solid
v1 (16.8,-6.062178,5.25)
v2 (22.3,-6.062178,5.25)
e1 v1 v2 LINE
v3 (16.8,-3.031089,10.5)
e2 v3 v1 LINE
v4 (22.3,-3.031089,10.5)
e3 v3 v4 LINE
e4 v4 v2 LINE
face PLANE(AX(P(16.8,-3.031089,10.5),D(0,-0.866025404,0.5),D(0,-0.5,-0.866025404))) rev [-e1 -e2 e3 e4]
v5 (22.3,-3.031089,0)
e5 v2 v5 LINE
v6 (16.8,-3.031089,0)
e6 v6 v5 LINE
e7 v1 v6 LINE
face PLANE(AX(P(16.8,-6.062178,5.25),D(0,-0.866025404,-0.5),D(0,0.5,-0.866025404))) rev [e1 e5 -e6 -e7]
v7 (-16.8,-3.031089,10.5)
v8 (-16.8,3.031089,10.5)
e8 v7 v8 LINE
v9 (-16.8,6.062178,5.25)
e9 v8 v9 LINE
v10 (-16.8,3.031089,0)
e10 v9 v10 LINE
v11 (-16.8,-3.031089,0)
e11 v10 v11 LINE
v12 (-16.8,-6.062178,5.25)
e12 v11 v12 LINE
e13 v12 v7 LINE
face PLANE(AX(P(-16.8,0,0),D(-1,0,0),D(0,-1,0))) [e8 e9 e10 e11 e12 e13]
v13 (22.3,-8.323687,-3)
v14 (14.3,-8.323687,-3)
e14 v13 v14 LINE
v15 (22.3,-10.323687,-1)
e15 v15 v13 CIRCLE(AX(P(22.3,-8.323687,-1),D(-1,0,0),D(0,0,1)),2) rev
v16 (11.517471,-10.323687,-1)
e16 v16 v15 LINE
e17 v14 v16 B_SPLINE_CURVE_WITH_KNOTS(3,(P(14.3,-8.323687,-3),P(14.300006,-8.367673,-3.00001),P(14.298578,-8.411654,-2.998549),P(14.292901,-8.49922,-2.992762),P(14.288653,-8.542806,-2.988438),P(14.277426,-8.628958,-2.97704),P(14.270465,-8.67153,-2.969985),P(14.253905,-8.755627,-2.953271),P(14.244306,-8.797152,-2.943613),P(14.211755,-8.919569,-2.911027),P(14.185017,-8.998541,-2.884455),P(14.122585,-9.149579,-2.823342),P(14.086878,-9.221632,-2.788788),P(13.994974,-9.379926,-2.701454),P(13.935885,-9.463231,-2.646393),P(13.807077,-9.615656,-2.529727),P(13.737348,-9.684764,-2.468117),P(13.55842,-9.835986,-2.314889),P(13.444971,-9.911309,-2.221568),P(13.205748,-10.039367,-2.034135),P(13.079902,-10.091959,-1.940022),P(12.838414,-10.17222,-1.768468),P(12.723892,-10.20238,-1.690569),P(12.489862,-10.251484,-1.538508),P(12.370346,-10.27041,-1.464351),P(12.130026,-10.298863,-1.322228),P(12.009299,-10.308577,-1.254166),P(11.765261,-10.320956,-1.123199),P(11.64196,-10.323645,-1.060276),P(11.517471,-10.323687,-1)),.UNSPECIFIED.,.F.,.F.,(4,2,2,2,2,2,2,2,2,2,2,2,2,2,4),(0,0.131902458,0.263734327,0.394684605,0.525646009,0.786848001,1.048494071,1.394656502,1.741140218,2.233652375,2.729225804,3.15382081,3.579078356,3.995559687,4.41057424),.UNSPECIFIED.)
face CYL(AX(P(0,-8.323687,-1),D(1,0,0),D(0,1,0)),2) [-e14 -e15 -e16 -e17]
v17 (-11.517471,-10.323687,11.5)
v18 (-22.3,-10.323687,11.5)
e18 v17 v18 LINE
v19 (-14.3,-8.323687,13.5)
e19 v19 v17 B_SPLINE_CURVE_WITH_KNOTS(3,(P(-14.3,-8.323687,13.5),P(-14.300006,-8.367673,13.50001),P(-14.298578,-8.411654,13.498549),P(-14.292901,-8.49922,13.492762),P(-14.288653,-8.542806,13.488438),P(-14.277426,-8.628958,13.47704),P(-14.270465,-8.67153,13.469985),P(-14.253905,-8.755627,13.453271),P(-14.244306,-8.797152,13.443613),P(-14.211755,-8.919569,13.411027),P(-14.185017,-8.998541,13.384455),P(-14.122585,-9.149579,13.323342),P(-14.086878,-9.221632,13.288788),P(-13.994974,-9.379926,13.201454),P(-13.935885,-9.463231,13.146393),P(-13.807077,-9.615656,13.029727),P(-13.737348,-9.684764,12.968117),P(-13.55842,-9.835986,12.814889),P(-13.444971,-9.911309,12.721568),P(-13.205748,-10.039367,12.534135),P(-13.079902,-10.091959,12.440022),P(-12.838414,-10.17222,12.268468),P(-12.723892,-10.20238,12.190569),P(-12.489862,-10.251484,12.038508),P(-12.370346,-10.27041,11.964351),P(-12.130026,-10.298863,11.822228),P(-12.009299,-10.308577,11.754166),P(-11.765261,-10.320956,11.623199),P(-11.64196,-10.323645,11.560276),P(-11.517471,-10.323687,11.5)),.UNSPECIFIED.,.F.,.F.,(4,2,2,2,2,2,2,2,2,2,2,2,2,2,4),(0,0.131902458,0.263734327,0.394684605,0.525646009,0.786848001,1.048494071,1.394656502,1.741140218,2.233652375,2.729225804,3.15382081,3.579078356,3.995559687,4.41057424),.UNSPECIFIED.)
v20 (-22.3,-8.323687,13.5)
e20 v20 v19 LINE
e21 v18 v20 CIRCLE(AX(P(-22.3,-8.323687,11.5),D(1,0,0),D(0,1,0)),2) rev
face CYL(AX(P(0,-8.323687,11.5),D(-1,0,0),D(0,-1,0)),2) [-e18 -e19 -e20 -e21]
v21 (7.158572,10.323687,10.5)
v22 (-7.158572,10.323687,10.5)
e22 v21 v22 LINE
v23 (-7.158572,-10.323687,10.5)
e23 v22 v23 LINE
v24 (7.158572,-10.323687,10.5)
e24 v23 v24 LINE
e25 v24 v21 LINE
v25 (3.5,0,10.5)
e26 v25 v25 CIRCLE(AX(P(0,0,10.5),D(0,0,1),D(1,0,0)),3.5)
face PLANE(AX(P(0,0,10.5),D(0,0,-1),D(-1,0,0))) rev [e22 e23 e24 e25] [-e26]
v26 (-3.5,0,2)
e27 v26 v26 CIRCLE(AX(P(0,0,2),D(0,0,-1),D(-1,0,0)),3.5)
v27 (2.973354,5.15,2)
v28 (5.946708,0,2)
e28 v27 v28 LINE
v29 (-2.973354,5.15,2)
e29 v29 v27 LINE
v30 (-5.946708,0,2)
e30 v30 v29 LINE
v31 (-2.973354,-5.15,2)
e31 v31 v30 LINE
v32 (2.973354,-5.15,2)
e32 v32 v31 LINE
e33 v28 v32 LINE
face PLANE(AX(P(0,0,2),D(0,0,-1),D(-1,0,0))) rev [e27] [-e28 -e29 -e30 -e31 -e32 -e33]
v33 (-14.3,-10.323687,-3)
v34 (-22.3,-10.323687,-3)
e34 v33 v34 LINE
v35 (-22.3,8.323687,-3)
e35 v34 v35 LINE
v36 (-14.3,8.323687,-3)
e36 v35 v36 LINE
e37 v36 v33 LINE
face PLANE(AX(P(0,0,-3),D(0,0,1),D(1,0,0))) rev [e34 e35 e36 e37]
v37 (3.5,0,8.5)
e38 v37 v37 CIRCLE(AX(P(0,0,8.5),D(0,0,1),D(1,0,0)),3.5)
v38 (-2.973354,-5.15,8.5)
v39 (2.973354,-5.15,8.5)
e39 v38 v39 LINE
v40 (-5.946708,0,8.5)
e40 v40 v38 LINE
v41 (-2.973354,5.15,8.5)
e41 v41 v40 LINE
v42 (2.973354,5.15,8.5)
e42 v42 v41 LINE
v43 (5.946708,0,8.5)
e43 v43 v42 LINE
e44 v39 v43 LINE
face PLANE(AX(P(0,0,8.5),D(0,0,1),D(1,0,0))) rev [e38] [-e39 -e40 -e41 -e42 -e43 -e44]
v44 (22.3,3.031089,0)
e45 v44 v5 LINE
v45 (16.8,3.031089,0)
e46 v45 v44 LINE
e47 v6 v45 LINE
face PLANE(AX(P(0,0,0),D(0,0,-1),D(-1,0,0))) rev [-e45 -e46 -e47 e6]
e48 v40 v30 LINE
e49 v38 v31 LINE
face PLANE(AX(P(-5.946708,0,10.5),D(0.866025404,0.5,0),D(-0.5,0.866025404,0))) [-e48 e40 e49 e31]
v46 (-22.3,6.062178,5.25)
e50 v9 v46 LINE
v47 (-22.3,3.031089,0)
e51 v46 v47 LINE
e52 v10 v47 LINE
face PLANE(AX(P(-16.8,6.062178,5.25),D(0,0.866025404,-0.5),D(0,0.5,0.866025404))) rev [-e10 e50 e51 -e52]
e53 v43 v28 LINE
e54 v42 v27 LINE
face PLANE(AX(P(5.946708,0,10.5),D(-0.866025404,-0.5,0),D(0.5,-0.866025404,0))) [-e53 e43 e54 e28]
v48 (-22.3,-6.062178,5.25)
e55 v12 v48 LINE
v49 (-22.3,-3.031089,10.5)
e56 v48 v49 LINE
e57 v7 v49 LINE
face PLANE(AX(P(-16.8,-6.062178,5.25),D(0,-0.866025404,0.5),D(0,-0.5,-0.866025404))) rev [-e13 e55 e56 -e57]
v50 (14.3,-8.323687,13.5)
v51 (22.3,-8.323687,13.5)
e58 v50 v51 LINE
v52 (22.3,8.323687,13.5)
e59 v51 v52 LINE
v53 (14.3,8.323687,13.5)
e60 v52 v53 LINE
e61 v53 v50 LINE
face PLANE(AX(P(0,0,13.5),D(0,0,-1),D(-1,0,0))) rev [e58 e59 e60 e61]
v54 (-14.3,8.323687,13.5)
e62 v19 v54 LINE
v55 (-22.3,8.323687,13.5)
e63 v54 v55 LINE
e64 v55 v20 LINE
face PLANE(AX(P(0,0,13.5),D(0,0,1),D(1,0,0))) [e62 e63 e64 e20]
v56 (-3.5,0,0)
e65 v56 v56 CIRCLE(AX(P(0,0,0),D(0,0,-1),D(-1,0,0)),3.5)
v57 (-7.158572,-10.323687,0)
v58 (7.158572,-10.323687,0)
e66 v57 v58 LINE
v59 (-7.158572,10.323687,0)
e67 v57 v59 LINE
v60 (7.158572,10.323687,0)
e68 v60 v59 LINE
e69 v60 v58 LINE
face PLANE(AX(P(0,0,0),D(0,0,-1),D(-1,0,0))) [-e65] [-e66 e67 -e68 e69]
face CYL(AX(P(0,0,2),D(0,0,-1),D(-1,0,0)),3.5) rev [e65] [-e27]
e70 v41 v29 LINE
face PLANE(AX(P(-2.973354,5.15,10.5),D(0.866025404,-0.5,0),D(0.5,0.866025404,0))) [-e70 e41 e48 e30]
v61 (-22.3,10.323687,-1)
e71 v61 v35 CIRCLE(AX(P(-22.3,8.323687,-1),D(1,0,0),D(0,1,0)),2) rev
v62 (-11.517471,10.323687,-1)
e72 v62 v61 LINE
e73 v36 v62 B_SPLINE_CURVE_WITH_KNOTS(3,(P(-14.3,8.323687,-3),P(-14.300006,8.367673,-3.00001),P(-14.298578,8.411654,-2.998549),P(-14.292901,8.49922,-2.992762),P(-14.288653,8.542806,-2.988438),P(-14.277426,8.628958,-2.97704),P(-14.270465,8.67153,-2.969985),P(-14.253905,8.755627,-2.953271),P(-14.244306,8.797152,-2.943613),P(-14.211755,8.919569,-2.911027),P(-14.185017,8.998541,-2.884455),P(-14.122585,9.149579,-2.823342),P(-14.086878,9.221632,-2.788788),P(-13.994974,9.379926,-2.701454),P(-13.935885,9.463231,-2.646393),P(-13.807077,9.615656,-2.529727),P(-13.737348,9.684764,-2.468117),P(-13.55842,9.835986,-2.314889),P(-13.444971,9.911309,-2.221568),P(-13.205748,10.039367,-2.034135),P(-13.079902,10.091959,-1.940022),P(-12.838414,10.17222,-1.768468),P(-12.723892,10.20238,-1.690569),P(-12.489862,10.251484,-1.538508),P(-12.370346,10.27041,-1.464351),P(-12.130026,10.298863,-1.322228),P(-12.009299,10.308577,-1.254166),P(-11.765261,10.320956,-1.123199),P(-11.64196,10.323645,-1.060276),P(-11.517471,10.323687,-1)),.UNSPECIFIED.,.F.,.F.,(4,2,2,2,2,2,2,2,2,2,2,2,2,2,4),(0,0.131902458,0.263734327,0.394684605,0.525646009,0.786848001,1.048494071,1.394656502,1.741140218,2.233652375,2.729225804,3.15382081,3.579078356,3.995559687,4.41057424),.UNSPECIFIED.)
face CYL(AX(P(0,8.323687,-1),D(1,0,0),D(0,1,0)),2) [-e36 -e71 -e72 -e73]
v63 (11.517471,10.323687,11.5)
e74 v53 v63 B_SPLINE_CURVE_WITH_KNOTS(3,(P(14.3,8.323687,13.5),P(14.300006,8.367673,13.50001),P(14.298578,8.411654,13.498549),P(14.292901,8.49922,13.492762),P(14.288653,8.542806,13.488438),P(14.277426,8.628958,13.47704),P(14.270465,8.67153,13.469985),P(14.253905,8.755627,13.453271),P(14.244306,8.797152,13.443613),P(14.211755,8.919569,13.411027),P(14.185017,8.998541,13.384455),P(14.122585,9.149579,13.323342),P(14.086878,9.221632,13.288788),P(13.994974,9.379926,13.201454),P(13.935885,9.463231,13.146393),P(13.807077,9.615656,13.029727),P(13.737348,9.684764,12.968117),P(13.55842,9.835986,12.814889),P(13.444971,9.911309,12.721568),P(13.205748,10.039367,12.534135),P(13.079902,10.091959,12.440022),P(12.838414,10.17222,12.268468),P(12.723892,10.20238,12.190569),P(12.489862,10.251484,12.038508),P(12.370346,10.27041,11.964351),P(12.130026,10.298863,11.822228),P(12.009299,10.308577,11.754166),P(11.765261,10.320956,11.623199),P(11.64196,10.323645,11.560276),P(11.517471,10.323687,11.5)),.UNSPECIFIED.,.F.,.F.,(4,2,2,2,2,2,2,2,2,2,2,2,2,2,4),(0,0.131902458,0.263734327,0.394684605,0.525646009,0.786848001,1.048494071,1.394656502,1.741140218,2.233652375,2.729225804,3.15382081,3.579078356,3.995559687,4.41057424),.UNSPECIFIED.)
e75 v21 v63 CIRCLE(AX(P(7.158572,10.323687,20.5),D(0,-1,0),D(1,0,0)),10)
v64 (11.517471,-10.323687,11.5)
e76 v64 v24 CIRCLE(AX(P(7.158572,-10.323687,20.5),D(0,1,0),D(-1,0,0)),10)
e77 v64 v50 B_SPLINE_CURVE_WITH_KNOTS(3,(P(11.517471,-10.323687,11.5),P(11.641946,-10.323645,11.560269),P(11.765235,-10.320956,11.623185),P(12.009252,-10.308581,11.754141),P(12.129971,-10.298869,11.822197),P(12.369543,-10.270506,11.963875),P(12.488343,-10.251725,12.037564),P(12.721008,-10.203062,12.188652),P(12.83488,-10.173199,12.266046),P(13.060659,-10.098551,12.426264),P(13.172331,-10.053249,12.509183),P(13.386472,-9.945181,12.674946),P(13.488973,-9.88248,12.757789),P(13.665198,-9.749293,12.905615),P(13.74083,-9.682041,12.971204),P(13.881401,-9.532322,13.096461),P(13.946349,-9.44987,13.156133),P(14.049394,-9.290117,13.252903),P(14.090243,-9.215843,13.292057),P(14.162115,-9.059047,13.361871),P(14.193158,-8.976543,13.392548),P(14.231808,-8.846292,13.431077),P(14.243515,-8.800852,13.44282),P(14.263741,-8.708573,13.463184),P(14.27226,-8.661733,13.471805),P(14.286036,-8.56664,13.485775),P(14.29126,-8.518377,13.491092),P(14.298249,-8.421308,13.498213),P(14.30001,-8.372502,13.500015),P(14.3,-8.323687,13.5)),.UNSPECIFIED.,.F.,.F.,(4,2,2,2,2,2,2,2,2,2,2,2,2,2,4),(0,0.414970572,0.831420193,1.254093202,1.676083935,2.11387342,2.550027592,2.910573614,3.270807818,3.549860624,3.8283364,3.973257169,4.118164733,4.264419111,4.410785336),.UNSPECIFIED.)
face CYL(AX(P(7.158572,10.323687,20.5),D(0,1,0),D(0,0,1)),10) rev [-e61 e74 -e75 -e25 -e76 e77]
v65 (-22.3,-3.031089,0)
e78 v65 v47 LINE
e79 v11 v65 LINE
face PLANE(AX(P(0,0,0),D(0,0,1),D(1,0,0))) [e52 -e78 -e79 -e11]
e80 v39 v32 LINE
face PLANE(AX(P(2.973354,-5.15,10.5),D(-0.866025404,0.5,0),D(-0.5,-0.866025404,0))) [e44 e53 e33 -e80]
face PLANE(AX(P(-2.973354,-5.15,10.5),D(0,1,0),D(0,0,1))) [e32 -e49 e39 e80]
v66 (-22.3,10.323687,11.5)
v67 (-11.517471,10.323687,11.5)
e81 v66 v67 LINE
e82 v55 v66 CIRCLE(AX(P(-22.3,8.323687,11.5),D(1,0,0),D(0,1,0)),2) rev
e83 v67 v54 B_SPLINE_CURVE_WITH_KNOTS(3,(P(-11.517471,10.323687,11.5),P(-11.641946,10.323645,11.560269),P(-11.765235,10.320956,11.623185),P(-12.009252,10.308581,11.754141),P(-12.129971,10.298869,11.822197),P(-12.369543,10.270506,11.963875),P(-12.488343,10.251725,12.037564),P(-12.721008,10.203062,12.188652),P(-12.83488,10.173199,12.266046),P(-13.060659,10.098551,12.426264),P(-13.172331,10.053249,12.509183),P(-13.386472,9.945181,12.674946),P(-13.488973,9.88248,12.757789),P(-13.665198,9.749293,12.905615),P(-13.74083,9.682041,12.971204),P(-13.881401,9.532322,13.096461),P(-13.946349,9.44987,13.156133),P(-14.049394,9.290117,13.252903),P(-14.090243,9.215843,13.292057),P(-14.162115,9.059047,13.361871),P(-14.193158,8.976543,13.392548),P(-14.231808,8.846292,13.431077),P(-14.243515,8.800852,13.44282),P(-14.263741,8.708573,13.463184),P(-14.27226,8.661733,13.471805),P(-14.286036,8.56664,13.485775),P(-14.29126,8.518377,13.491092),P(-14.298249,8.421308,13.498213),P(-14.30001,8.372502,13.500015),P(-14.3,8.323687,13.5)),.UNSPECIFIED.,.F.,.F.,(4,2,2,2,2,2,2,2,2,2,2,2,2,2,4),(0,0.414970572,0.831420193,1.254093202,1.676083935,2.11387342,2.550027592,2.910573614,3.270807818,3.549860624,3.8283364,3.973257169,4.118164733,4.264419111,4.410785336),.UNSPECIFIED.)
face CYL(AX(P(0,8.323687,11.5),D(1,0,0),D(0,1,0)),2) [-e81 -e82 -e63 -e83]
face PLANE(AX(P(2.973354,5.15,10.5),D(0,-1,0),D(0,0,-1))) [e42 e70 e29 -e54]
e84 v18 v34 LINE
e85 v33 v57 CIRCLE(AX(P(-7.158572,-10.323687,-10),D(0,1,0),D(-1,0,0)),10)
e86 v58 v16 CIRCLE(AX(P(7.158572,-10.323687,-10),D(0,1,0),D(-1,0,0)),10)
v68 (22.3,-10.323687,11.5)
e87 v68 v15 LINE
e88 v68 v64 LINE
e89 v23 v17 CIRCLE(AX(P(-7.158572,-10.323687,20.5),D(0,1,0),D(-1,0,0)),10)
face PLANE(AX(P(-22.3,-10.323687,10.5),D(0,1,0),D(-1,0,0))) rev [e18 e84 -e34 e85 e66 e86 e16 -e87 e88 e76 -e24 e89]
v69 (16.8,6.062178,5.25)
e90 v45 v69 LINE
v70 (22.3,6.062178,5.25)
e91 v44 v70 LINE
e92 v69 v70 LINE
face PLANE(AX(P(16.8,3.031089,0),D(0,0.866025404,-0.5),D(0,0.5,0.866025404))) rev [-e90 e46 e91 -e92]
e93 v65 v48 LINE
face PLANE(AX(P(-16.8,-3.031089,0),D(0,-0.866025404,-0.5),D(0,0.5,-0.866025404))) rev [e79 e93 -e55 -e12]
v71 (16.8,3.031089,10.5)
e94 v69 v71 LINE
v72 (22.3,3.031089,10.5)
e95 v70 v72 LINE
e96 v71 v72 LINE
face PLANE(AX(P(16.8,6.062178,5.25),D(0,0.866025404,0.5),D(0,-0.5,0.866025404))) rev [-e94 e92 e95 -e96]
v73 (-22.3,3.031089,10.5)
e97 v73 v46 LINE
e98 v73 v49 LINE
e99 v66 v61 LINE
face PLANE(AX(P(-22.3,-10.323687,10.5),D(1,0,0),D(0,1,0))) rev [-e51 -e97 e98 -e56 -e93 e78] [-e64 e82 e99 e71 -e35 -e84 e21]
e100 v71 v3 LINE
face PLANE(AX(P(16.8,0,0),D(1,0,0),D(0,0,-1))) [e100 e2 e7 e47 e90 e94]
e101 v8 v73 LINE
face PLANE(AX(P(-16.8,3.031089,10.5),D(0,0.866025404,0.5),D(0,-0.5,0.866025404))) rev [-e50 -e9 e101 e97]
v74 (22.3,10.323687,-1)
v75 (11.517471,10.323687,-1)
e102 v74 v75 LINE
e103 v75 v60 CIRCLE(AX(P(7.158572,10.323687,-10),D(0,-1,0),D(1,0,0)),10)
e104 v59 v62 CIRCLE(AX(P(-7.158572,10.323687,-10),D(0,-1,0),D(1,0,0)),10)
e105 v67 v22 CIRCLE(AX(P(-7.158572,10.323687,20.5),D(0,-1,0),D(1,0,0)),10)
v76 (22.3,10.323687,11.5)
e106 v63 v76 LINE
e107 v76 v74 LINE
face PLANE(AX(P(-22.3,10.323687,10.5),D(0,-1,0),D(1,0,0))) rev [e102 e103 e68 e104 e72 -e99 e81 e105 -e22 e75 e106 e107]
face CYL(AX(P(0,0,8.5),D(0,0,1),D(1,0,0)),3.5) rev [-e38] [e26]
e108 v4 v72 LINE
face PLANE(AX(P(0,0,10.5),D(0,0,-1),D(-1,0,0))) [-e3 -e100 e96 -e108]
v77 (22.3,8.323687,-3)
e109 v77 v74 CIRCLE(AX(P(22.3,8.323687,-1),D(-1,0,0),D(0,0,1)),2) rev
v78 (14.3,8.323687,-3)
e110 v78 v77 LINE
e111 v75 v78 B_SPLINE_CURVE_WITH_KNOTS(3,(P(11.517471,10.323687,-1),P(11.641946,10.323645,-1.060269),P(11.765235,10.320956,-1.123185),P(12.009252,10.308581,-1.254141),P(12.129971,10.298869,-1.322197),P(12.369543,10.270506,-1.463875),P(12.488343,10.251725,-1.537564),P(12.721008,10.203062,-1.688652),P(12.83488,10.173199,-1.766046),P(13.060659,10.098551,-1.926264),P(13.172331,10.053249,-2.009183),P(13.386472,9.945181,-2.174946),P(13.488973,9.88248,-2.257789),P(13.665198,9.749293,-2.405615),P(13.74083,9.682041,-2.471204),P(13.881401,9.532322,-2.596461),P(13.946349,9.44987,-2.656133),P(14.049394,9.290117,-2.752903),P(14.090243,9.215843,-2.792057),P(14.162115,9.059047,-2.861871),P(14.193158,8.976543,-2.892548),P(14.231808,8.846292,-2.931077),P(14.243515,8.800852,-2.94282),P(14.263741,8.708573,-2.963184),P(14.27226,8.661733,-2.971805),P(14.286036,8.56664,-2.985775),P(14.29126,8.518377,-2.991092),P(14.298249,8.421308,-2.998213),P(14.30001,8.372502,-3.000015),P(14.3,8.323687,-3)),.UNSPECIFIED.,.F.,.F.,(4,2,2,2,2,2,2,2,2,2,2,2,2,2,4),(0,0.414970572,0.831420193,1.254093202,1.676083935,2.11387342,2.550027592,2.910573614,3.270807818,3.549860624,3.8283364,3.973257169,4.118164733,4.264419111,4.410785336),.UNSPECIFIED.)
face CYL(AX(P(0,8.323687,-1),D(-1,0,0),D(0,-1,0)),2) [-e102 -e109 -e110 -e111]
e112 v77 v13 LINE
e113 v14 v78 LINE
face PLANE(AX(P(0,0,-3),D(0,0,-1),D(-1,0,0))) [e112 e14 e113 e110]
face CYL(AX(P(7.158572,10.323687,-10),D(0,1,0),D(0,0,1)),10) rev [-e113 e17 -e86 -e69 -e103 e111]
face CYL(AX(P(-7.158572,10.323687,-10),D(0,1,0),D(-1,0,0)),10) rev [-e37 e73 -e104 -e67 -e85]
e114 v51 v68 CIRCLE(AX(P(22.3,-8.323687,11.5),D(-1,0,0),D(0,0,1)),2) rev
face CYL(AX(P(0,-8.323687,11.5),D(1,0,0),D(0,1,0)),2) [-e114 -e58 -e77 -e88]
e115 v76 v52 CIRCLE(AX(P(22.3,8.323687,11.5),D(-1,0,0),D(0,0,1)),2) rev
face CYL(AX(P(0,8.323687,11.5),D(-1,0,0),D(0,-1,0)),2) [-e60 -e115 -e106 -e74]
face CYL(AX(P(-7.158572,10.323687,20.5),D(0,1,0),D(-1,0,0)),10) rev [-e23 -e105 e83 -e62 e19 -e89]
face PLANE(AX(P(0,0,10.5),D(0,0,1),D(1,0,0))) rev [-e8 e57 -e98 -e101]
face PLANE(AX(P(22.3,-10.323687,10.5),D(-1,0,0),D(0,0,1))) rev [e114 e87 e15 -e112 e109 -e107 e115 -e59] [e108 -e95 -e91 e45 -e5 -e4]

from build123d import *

# Parameters (mm, degrees)
CROQUIS1_W              = 44.6
CROQUIS1_H              = 20.647373716
SALIENTE_EXTRUIR2_DEPTH = 10.5
CROQUIS2_R              = 7.366343287
CROQUIS2_R_2            = 3.5
SALIENTE_EXTRUIR3_DEPTH = 2
SALIENTE_EXTRUIR4_START = -2
CROQUIS3_R              = 6.292932571
CROQUIS3_R_2            = 3.5
SALIENTE_EXTRUIR4_DEPTH = 2
CORTAR_EXTRUIR1_DEPTH   = 5.5
CORTAR_EXTRUIR2_DEPTH   = 5.5
CROQUIS6_W              = 8
CROQUIS6_H              = 20.647373716
SALIENTE_EXTRUIR5_DEPTH = 3
CROQUIS7_W              = 8
CROQUIS7_H              = 20.647373716
SALIENTE_EXTRUIR6_DEPTH = 3
REDONDEO1_R             = 10
REDONDEO2_R             = 2


with BuildPart() as part:
    # Croquis1 → Saliente-Extruir2 (new body)
    with BuildSketch(Plane.XY):
        Rectangle(CROQUIS1_W, CROQUIS1_H)
        Polygon((5.946707773, 0), (2.973353886, 5.15), (-2.973353886, 5.15), (-5.946707773, 0), (-2.973353886, -5.15), (2.973353886, -5.15), align=None, mode=Mode.SUBTRACT)
    extrude(amount=SALIENTE_EXTRUIR2_DEPTH)

    # Croquis2 → Saliente-Extruir3 (add)
    with BuildSketch(Plane.XY.offset(10.5)):
        Circle(CROQUIS2_R)
        Circle(CROQUIS2_R_2, mode=Mode.SUBTRACT)
    extrude(amount=-SALIENTE_EXTRUIR3_DEPTH)

    # Croquis3 → Saliente-Extruir4 (add)
    with BuildSketch(Plane(origin=(0, 0, 0), x_dir=(-1, 0, 0), z_dir=(0, 0, -1)).offset(SALIENTE_EXTRUIR4_START)):
        Circle(CROQUIS3_R)
        with Locations(Location((0, 0, 0), (0, 0, 180))):
            Circle(CROQUIS3_R_2, mode=Mode.SUBTRACT)
    extrude(amount=SALIENTE_EXTRUIR4_DEPTH)

    # Croquis4 → Cortar-Extruir1 (cut)
    with BuildSketch(Plane(origin=(22.3, 0, 0), x_dir=(0, 0, -1), z_dir=(1, 0, 0))):
        Polygon((-5.25, 6.062177826), (-10.5, 3.031088913), (-10.5, -3.031088913), (-5.25, -6.062177826), (0, -3.031088913), (0, 3.031088913), align=None)
    extrude(amount=-CORTAR_EXTRUIR1_DEPTH, mode=Mode.SUBTRACT)

    # Croquis5 → Cortar-Extruir2 (cut)
    with BuildSketch(Plane.ZY.offset(22.3)):
        Polygon((5.25, 6.062177826), (0, 3.031088913), (0, -3.031088913), (5.25, -6.062177826), (10.5, -3.031088913), (10.5, 3.031088913), align=None)
    extrude(amount=-CORTAR_EXTRUIR2_DEPTH, mode=Mode.SUBTRACT)

    # Croquis6 → Saliente-Extruir5 (add)
    with BuildSketch(Plane(origin=(0, 0, 0), x_dir=(-1, 0, 0), z_dir=(0, 0, -1))):
        with Locations((-18.3, 0)):
            Rectangle(CROQUIS6_W, CROQUIS6_H)
        with Locations((18.3, 0)):
            Rectangle(CROQUIS6_W, CROQUIS6_H)
    extrude(amount=SALIENTE_EXTRUIR5_DEPTH)

    # Croquis7 → Saliente-Extruir6 (add)
    with BuildSketch(Plane.XY.offset(10.5)):
        with Locations((-18.3, 0)):
            Rectangle(CROQUIS7_W, CROQUIS7_H)
        with Locations((18.3, 0)):
            Rectangle(CROQUIS7_W, CROQUIS7_H)
    extrude(amount=SALIENTE_EXTRUIR6_DEPTH)

    # Redondeo1
    # the kernel refuses this fillet: 10 mm, written as the material it adds along each edge
    with BuildSketch(Plane(origin=(-14.3, 10.323686858, 10.5), x_dir=(1, 0, 0), z_dir=(0, -1, 0)), Plane(origin=(14.3, 10.323686858, 0), x_dir=(-1, 0, 0), z_dir=(0, -1, 0))) as redondeo1_piece_1:
        with BuildLine():
            CenterArc((7.141428429, 10), REDONDEO1_R, 224.427004001, 45.572995999)
            Line((0, 3), (-0.142828569, 2.86))
            ThreePointArc((-0.142828569, 2.86), (-0.2, 1.5), (-0.2, 0))
            Line((-0.2, 0), (0, -0.2))
            Line((0, -0.2), (7.141428429, -0.2))
            Line((7.141428429, -0.2), (7.141428429, 0))
        make_face()
    extrude(amount=20.647373716)
    with BuildSketch(Plane(origin=(14.3, 10.323686858, 10.5), x_dir=(0, 0, 1), z_dir=(0, -1, 0)), Plane(origin=(-14.3, 10.323686858, 0), x_dir=(0, 0, -1), z_dir=(0, -1, 0))) as redondeo1_piece_2:
        with BuildLine():
            CenterArc((10, 7.141428429), REDONDEO1_R, 180, 45.572995999)
            Line((0, 7.141428429), (-0.2, 7.141428429))
            Line((-0.2, 7.141428429), (-0.2, 0))
            Line((-0.2, 0), (0, -0.2))
            ThreePointArc((0, -0.2), (1.5, -0.2), (2.86, -0.142828569))
            Line((2.86, -0.142828569), (3, 0))
        make_face()
    extrude(amount=20.647373716)

    # Redondeo2
    redondeo2_edges = [part.edges().sort_by_distance(p)[0] for p in [
        (18.3, -10.323686858, -3),
        (18.3, 10.323686858, -3),
        (-18.3, 10.323686858, -3),
        (-18.3, -10.323686858, 13.5),
        (-18.3, 10.323686858, 13.5),
        (18.3, 10.323686858, 13.5),
        (18.3, -10.323686858, 13.5),
    ]]
    fillet(redondeo2_edges, radius=REDONDEO2_R)


solid = part.part
